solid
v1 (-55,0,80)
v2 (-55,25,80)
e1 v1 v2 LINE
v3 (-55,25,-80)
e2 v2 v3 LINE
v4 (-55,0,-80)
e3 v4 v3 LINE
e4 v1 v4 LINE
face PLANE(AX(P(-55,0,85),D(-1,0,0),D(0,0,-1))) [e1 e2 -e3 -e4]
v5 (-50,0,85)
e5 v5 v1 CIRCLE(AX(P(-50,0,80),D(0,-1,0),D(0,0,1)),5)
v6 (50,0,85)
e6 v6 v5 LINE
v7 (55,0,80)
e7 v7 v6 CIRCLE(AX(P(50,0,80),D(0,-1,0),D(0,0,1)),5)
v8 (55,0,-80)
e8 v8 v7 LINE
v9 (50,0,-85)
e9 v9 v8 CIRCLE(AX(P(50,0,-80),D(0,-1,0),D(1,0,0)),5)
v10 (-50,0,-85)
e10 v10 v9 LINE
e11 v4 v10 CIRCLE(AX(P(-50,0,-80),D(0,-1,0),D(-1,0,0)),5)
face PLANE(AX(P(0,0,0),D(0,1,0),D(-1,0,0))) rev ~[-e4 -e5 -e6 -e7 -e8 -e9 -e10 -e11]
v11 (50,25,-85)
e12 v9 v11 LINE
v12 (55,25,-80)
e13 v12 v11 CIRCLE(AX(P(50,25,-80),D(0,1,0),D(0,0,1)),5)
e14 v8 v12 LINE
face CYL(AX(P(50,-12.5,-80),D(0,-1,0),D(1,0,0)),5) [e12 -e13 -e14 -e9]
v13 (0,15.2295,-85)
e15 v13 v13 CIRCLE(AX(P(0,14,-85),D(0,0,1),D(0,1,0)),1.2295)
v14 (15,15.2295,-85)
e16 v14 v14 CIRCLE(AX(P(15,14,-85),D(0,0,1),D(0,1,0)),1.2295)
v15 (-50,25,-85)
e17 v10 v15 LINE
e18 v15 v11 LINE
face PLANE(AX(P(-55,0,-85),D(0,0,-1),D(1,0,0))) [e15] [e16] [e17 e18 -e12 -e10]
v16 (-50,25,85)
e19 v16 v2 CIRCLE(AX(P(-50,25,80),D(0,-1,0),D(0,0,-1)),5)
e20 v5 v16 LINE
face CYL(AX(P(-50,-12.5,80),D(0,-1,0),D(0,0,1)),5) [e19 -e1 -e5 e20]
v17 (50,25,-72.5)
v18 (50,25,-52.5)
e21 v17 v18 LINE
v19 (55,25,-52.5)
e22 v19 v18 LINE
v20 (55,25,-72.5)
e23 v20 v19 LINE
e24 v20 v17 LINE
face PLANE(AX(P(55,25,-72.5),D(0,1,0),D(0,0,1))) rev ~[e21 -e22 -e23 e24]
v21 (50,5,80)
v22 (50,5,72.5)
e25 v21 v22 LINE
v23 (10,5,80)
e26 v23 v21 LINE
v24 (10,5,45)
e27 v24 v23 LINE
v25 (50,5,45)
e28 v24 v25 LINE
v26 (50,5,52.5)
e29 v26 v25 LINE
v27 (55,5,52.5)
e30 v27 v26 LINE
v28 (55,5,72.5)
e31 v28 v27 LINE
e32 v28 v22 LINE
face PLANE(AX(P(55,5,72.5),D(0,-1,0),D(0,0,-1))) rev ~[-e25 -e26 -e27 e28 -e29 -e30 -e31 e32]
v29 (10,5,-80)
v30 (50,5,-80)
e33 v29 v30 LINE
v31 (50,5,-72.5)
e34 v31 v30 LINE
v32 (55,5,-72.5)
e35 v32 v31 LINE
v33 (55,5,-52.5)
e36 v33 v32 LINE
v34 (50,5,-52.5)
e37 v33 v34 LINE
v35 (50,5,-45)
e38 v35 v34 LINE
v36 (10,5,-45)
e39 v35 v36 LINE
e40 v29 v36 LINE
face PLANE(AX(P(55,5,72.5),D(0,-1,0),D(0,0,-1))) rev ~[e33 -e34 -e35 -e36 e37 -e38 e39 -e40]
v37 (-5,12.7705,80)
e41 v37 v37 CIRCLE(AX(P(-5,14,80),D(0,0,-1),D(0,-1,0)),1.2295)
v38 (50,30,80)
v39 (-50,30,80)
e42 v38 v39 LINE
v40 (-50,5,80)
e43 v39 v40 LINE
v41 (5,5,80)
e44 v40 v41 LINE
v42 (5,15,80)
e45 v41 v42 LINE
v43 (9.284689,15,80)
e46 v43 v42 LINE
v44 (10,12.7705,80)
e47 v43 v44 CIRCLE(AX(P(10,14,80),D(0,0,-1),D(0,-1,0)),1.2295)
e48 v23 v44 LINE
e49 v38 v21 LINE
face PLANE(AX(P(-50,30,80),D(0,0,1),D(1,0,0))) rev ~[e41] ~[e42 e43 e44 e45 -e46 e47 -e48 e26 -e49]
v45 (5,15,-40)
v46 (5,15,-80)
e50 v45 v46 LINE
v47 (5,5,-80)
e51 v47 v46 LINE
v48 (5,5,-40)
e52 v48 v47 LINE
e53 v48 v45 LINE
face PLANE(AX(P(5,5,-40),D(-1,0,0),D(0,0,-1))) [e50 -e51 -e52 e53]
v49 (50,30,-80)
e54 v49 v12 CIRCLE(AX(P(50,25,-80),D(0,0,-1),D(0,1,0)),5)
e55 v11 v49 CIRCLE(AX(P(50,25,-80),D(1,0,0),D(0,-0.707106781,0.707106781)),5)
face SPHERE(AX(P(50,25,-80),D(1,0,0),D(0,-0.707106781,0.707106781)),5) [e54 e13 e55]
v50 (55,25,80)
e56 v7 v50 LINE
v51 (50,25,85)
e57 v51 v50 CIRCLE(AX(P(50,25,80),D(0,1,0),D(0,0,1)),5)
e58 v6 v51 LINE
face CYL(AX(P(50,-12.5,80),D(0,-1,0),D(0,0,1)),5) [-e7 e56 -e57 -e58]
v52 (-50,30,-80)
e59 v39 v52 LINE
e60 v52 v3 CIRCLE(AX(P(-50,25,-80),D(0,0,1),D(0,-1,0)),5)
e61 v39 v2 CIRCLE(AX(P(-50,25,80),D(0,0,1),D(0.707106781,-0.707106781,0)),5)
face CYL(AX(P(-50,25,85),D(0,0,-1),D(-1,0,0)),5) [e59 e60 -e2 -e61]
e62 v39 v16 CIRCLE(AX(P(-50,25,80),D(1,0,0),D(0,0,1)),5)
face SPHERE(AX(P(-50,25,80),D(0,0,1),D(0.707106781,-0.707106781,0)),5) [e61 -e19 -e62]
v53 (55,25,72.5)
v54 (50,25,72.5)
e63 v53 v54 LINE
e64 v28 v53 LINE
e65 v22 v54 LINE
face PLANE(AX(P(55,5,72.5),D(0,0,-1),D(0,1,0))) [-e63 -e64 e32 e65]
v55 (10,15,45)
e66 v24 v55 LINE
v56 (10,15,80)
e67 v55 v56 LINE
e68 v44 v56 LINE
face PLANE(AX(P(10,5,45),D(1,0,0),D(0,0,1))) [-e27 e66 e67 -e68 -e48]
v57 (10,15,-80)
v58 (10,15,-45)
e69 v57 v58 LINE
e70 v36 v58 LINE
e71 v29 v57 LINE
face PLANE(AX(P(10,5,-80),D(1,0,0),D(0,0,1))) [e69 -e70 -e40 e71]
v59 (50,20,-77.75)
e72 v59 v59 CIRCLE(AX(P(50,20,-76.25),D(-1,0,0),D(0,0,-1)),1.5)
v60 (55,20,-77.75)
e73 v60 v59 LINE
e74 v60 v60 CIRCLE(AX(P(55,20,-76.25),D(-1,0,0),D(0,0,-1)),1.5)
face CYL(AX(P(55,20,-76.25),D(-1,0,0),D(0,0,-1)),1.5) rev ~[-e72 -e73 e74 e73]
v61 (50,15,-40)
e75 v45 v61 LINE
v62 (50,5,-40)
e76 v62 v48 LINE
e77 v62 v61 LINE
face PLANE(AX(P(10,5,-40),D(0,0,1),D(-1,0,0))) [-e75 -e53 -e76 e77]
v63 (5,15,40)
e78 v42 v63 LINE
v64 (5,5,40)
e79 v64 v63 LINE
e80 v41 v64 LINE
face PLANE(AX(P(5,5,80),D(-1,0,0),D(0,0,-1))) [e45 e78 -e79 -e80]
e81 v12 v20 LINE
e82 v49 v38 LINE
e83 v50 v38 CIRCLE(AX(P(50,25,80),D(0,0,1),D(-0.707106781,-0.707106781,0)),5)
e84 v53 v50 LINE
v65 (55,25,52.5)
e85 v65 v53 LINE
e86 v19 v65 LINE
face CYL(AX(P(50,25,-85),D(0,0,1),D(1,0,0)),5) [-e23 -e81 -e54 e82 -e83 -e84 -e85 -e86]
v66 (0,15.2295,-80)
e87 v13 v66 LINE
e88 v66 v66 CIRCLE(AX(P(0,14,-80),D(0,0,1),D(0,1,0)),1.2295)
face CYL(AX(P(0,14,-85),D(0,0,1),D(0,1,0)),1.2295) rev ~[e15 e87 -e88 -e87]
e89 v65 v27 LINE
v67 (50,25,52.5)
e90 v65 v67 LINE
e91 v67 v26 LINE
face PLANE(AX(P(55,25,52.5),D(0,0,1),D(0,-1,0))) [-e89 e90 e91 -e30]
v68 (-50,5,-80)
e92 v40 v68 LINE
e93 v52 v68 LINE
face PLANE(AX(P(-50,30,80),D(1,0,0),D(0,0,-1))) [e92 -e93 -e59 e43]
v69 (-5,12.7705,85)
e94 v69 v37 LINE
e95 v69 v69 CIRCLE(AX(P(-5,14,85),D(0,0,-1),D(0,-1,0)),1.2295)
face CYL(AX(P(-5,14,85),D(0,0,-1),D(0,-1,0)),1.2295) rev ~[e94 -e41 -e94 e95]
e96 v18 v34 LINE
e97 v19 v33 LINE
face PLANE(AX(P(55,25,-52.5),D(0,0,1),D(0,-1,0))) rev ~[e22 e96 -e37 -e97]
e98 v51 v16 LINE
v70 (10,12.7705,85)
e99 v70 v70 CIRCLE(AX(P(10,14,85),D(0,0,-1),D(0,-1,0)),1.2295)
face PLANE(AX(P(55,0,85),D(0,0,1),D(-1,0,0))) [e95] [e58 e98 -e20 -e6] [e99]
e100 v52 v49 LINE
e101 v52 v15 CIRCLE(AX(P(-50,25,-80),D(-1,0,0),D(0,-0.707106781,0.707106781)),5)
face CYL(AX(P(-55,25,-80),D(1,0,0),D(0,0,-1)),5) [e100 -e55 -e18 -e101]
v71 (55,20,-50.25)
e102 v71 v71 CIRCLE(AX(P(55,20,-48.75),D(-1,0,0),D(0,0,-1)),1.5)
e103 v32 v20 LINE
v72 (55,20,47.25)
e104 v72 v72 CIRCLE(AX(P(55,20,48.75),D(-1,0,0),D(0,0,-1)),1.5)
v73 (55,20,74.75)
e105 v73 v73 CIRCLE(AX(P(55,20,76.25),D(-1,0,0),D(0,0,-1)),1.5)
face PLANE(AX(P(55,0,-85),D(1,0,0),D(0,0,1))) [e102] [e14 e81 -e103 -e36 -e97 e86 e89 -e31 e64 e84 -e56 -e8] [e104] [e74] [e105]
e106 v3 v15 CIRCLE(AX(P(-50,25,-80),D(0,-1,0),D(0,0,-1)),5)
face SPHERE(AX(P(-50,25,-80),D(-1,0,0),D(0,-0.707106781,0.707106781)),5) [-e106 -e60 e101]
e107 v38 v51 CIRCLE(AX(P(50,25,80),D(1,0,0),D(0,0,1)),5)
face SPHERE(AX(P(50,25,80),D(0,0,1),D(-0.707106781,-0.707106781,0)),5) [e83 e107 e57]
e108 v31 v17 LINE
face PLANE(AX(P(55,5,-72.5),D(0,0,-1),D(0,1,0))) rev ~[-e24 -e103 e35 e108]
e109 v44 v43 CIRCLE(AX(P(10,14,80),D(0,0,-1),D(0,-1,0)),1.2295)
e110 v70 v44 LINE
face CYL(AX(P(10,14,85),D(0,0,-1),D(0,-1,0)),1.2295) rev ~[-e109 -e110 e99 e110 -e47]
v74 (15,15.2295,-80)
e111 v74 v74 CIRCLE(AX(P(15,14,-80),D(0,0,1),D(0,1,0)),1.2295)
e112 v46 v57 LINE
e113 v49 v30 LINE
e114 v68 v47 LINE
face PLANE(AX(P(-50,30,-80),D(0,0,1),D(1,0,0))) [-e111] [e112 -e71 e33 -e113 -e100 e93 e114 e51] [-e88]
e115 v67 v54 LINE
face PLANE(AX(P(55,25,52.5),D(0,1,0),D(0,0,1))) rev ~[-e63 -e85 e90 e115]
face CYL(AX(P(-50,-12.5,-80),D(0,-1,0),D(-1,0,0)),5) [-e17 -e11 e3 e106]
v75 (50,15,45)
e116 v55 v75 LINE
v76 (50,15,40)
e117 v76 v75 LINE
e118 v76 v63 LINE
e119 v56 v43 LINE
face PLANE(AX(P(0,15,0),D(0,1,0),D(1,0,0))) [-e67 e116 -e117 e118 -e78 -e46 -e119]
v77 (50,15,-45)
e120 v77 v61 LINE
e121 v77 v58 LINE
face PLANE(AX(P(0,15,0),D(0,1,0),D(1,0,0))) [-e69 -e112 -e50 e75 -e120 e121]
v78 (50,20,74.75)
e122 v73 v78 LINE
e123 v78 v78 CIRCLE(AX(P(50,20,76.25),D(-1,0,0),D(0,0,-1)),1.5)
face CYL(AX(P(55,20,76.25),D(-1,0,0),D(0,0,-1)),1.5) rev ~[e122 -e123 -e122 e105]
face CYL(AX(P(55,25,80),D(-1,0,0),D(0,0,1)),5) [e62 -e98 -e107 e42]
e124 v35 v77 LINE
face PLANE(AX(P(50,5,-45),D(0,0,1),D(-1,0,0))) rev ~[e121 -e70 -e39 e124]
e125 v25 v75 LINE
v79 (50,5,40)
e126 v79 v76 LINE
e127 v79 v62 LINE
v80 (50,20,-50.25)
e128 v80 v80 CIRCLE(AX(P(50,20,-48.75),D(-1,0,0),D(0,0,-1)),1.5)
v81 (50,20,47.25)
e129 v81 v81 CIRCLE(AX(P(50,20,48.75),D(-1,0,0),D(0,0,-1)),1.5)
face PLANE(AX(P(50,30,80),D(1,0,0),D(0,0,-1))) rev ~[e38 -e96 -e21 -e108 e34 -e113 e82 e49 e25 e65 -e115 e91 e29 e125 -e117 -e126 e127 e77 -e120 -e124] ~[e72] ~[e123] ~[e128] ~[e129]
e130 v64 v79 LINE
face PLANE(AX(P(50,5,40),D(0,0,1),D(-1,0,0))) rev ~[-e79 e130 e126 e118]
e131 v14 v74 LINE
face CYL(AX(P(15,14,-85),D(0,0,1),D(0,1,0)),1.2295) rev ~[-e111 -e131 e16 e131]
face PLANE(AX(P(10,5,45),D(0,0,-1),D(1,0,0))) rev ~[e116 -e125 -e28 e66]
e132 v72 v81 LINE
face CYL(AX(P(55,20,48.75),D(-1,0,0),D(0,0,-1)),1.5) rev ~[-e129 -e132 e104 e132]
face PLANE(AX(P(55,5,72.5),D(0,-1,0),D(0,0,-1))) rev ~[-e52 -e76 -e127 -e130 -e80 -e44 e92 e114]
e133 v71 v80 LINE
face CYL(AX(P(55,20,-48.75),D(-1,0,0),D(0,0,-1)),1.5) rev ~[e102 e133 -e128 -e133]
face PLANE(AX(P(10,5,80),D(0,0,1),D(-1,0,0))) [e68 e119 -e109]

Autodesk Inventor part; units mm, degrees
ref_plane "YZ Plane" through (0, 0, 0) normal (1, 0, 0) x (0, 1, 0)
ref_plane "XZ Plane" through (0, 0, 0) normal (0, 1, 0) x (-1, 0, 0)
ref_plane "XY Plane" through (0, 0, 0) normal (0, 0, 1) x (1, 0, 0)
sketch "Esquisse1" plane through (0, 0, 0) normal (0, 1, 0) x (-1, 0, 0)
  line L0 (-55, 85) -> (55, 85)
  line L1 (55, 85) -> (55, -85)
  line L2 (55, -85) -> (-55, -85)
  line L3 (-55, -85) -> (-55, 85)
  line L4 (-55, 85) -> (55, -85) construction
  line L5 (55, 85) -> (-55, -85) construction
  point P0 (0, 0)
  dimension "d0" = 170
  dimension "d1" = 110
extrude "Extrusion1" add sketch "Esquisse1" along normal blind 30
fillet "Congé1" radius 5 4 edges at (0, 30, 85) (55, 30, 0) (0, 30, -85) (-55, 30, 0)
fillet "Congé2" radius 5 8 edges at (-53.5355, 28.5355, -83.5355) (-55, 12.5, -85) (-53.5355, 28.5355, 83.5355) (-55, 12.5, 85) (53.5355, 28.5355, -83.5355) (55, 12.5, -85) (53.5355, 28.5355, 83.5355) (55, 12.5, 85)
sketch "Esquisse2" plane through (0, 30, 0) normal (0, 1, 0) x (1, 0, 0)
  line L0 (-50, -80) -> (-50, 80) projected
  line L1 (-50, 80) -> (50, 80) projected
  line L2 (-50, -80) -> (50, -80)
  line L3 (50, -80) -> (50, 80)
  line L4 (50, 80) -> (-50, 80)
  line L5 (-50, 80) -> (-50, -80)
  point P0 (0, 0)
extrude "Extrusion2" cut sketch "Esquisse2" against normal blind 25
sketch "Esquisse3" plane through (55, 0, -85) normal (0, 0, -1) x (-1, 0, 0)
  line L0 (55, 14) -> (40, 14) construction
  line L1 (105, 0) -> (0, 0) construction
  line L2 (0, 0) -> (0, 25) construction
  point P0 (55, 0)
  dimension "d15" = 14
  dimension "d16" = 15
  dimension "d17" = 40
hole "Perçage1" at (15, 14, -85) at (0, 14, -85) direction (0, 0, 1) diameter 2.459 depth 8.8 tip angle 118 thread size "M3x0.5" class "6H" standard "ISO Metric profile"
sketch "Esquisse4" plane through (-50, 0, 85) normal (0, 0, 1) x (1, 0, 0)
  line L0 (45, 14) -> (60, 14) construction
  line L1 (100, 25) -> (100, 0) construction
  line L2 (100, 0) -> (0, 0) construction
  point P0 (50, 0)
  dimension "d25" = 15
  dimension "d26" = 40
  dimension "d27" = 14
hole "Perçage2" at (-5, 14, 85) at (10, 14, 85) direction (0, 0, -1) diameter 2.459 depth 8.8 tip angle 118 thread size "M3x0.5" class "6H" standard "ISO Metric profile"
sketch "Esquisse5" plane through (55, 0, 80) normal (1, 0, 0) x (0, 0, -1)
  line L0 (160, 25) -> (0, 25) projected
  line L1 (0, 5) -> (160, 5) projected
  line L2 (7.5, 25) -> (27.5, 25)
  line L3 (27.5, 25) -> (27.5, 5)
  line L4 (27.5, 5) -> (7.5, 5)
  line L5 (7.5, 5) -> (7.5, 25)
  line L6 (0, 0) -> (0, 25) projected
  line L7 (152.5, 25) -> (132.5, 25)
  line L8 (132.5, 25) -> (132.5, 5)
  line L9 (132.5, 5) -> (152.5, 5)
  line L10 (152.5, 5) -> (152.5, 25)
  line L11 (160, 25) -> (160, 0) projected
  point P0 (80, 0)
  dimension "d40" = 7.5
  dimension "d41" = 20
  dimension "d42" = 7.5
  dimension "d43" = 20
extrude "Extrusion3" cut sketch "Esquisse5" against normal blind 5 contours L10 L1 L8 L0 | L3 L1 L5 L0
sketch "Esquisse6" plane through (0, 5, 0) normal (0, 1, 0) x (1, 0, 0)
  line L0 (-50, 80) -> (50, 80) projected
  line L1 (50, -80) -> (-50, -80) projected
  line L2 (25, -80) -> (30, -80)
  line L3 (50, 52.5) -> (50, -52.5) projected
  line L4 (50, 45) -> (10, 45)
  line L5 (10, 45) -> (10, 40)
  line L6 (10, 40) -> (50, 40)
  line L7 (50, 40) -> (50, 45)
  line L8 (10, 40) -> (5, 40)
  line L9 (5, 40) -> (5, 80)
  line L10 (5, 80) -> (10, 80)
  line L11 (10, 80) -> (10, 40)
  line L12 (55, 52.5) -> (50, 52.5) projected
  line L13 (50, 80) -> (50, -80) projected
  line L14 (10, -80) -> (5, -80)
  line L15 (5, -80) -> (5, -40)
  line L16 (5, -40) -> (10, -40)
  line L17 (10, -40) -> (10, -80)
  line L18 (50, -40) -> (10, -40)
  line L19 (10, -40) -> (10, -45)
  line L20 (10, -45) -> (50, -45)
  line L21 (50, -45) -> (50, -40)
  point P0 (0, 0)
  point P1 (7.5, -40)
  dimension "d44" = 5
  dimension "d45" = 5
  dimension "d46" = 7.5
  dimension "d47" = 40
  dimension "d48" = 5
  dimension "d49" = 7.5
  dimension "d50" = 5
  dimension "d51" = 40
extrude "Extrusion4" add sketch "Esquisse6" along normal blind 10 contours L0 L11 L5 L8 L9 | L4 L3 L6 L5 | L20 L17 L18 L3 | L1 L15 L16 L17
sketch "Esquisse8" plane through (55, 0, 80) normal (1, 0, 0) x (0, 0, -1)
  line L0 (0, 25) -> (0, 0) construction
  line L1 (0, 20) -> (3.75, 20) construction
  line L2 (3.75, 20) -> (7.5, 20) construction
  line L3 (7.5, 25) -> (7.5, 5) construction
  line L4 (3.75, 20) -> (3.75, 15) construction
  line L5 (0, 15) -> (35, 15) construction
  line L6 (3.75, 20) -> (3.75, 25) construction
  line L7 (160, 25) -> (0, 25) construction
  line L8 (31.25, 20) -> (31.25, 25) construction
  line L9 (31.25, 20) -> (27.5, 20) construction
  line L10 (27.5, 5) -> (27.5, 25) construction
  line L11 (128.75, 20) -> (128.75, 25) construction
  line L12 (128.75, 20) -> (132.5, 20) construction
  line L13 (156.25, 20) -> (156.25, 25) construction
  line L14 (156.25, 20) -> (152.5, 20) construction
  line L15 (152.5, 25) -> (152.5, 5) construction
  line L16 (132.5, 5) -> (132.5, 25) construction
  point P0 (80, 0)
hole "Perçage4" at (55, 20, 76.25) at (55, 20, 48.75) at (55, 20, -48.75) at (55, 20, -76.25) direction (-1, 0, 0) diameter 3 depth 8.8 tip angle 118
equation "\"d45\" = d44"
equation "\"d50\" = d45"
equation "\"d51\" = d47"
properties part number "P1794_001_basManette"
